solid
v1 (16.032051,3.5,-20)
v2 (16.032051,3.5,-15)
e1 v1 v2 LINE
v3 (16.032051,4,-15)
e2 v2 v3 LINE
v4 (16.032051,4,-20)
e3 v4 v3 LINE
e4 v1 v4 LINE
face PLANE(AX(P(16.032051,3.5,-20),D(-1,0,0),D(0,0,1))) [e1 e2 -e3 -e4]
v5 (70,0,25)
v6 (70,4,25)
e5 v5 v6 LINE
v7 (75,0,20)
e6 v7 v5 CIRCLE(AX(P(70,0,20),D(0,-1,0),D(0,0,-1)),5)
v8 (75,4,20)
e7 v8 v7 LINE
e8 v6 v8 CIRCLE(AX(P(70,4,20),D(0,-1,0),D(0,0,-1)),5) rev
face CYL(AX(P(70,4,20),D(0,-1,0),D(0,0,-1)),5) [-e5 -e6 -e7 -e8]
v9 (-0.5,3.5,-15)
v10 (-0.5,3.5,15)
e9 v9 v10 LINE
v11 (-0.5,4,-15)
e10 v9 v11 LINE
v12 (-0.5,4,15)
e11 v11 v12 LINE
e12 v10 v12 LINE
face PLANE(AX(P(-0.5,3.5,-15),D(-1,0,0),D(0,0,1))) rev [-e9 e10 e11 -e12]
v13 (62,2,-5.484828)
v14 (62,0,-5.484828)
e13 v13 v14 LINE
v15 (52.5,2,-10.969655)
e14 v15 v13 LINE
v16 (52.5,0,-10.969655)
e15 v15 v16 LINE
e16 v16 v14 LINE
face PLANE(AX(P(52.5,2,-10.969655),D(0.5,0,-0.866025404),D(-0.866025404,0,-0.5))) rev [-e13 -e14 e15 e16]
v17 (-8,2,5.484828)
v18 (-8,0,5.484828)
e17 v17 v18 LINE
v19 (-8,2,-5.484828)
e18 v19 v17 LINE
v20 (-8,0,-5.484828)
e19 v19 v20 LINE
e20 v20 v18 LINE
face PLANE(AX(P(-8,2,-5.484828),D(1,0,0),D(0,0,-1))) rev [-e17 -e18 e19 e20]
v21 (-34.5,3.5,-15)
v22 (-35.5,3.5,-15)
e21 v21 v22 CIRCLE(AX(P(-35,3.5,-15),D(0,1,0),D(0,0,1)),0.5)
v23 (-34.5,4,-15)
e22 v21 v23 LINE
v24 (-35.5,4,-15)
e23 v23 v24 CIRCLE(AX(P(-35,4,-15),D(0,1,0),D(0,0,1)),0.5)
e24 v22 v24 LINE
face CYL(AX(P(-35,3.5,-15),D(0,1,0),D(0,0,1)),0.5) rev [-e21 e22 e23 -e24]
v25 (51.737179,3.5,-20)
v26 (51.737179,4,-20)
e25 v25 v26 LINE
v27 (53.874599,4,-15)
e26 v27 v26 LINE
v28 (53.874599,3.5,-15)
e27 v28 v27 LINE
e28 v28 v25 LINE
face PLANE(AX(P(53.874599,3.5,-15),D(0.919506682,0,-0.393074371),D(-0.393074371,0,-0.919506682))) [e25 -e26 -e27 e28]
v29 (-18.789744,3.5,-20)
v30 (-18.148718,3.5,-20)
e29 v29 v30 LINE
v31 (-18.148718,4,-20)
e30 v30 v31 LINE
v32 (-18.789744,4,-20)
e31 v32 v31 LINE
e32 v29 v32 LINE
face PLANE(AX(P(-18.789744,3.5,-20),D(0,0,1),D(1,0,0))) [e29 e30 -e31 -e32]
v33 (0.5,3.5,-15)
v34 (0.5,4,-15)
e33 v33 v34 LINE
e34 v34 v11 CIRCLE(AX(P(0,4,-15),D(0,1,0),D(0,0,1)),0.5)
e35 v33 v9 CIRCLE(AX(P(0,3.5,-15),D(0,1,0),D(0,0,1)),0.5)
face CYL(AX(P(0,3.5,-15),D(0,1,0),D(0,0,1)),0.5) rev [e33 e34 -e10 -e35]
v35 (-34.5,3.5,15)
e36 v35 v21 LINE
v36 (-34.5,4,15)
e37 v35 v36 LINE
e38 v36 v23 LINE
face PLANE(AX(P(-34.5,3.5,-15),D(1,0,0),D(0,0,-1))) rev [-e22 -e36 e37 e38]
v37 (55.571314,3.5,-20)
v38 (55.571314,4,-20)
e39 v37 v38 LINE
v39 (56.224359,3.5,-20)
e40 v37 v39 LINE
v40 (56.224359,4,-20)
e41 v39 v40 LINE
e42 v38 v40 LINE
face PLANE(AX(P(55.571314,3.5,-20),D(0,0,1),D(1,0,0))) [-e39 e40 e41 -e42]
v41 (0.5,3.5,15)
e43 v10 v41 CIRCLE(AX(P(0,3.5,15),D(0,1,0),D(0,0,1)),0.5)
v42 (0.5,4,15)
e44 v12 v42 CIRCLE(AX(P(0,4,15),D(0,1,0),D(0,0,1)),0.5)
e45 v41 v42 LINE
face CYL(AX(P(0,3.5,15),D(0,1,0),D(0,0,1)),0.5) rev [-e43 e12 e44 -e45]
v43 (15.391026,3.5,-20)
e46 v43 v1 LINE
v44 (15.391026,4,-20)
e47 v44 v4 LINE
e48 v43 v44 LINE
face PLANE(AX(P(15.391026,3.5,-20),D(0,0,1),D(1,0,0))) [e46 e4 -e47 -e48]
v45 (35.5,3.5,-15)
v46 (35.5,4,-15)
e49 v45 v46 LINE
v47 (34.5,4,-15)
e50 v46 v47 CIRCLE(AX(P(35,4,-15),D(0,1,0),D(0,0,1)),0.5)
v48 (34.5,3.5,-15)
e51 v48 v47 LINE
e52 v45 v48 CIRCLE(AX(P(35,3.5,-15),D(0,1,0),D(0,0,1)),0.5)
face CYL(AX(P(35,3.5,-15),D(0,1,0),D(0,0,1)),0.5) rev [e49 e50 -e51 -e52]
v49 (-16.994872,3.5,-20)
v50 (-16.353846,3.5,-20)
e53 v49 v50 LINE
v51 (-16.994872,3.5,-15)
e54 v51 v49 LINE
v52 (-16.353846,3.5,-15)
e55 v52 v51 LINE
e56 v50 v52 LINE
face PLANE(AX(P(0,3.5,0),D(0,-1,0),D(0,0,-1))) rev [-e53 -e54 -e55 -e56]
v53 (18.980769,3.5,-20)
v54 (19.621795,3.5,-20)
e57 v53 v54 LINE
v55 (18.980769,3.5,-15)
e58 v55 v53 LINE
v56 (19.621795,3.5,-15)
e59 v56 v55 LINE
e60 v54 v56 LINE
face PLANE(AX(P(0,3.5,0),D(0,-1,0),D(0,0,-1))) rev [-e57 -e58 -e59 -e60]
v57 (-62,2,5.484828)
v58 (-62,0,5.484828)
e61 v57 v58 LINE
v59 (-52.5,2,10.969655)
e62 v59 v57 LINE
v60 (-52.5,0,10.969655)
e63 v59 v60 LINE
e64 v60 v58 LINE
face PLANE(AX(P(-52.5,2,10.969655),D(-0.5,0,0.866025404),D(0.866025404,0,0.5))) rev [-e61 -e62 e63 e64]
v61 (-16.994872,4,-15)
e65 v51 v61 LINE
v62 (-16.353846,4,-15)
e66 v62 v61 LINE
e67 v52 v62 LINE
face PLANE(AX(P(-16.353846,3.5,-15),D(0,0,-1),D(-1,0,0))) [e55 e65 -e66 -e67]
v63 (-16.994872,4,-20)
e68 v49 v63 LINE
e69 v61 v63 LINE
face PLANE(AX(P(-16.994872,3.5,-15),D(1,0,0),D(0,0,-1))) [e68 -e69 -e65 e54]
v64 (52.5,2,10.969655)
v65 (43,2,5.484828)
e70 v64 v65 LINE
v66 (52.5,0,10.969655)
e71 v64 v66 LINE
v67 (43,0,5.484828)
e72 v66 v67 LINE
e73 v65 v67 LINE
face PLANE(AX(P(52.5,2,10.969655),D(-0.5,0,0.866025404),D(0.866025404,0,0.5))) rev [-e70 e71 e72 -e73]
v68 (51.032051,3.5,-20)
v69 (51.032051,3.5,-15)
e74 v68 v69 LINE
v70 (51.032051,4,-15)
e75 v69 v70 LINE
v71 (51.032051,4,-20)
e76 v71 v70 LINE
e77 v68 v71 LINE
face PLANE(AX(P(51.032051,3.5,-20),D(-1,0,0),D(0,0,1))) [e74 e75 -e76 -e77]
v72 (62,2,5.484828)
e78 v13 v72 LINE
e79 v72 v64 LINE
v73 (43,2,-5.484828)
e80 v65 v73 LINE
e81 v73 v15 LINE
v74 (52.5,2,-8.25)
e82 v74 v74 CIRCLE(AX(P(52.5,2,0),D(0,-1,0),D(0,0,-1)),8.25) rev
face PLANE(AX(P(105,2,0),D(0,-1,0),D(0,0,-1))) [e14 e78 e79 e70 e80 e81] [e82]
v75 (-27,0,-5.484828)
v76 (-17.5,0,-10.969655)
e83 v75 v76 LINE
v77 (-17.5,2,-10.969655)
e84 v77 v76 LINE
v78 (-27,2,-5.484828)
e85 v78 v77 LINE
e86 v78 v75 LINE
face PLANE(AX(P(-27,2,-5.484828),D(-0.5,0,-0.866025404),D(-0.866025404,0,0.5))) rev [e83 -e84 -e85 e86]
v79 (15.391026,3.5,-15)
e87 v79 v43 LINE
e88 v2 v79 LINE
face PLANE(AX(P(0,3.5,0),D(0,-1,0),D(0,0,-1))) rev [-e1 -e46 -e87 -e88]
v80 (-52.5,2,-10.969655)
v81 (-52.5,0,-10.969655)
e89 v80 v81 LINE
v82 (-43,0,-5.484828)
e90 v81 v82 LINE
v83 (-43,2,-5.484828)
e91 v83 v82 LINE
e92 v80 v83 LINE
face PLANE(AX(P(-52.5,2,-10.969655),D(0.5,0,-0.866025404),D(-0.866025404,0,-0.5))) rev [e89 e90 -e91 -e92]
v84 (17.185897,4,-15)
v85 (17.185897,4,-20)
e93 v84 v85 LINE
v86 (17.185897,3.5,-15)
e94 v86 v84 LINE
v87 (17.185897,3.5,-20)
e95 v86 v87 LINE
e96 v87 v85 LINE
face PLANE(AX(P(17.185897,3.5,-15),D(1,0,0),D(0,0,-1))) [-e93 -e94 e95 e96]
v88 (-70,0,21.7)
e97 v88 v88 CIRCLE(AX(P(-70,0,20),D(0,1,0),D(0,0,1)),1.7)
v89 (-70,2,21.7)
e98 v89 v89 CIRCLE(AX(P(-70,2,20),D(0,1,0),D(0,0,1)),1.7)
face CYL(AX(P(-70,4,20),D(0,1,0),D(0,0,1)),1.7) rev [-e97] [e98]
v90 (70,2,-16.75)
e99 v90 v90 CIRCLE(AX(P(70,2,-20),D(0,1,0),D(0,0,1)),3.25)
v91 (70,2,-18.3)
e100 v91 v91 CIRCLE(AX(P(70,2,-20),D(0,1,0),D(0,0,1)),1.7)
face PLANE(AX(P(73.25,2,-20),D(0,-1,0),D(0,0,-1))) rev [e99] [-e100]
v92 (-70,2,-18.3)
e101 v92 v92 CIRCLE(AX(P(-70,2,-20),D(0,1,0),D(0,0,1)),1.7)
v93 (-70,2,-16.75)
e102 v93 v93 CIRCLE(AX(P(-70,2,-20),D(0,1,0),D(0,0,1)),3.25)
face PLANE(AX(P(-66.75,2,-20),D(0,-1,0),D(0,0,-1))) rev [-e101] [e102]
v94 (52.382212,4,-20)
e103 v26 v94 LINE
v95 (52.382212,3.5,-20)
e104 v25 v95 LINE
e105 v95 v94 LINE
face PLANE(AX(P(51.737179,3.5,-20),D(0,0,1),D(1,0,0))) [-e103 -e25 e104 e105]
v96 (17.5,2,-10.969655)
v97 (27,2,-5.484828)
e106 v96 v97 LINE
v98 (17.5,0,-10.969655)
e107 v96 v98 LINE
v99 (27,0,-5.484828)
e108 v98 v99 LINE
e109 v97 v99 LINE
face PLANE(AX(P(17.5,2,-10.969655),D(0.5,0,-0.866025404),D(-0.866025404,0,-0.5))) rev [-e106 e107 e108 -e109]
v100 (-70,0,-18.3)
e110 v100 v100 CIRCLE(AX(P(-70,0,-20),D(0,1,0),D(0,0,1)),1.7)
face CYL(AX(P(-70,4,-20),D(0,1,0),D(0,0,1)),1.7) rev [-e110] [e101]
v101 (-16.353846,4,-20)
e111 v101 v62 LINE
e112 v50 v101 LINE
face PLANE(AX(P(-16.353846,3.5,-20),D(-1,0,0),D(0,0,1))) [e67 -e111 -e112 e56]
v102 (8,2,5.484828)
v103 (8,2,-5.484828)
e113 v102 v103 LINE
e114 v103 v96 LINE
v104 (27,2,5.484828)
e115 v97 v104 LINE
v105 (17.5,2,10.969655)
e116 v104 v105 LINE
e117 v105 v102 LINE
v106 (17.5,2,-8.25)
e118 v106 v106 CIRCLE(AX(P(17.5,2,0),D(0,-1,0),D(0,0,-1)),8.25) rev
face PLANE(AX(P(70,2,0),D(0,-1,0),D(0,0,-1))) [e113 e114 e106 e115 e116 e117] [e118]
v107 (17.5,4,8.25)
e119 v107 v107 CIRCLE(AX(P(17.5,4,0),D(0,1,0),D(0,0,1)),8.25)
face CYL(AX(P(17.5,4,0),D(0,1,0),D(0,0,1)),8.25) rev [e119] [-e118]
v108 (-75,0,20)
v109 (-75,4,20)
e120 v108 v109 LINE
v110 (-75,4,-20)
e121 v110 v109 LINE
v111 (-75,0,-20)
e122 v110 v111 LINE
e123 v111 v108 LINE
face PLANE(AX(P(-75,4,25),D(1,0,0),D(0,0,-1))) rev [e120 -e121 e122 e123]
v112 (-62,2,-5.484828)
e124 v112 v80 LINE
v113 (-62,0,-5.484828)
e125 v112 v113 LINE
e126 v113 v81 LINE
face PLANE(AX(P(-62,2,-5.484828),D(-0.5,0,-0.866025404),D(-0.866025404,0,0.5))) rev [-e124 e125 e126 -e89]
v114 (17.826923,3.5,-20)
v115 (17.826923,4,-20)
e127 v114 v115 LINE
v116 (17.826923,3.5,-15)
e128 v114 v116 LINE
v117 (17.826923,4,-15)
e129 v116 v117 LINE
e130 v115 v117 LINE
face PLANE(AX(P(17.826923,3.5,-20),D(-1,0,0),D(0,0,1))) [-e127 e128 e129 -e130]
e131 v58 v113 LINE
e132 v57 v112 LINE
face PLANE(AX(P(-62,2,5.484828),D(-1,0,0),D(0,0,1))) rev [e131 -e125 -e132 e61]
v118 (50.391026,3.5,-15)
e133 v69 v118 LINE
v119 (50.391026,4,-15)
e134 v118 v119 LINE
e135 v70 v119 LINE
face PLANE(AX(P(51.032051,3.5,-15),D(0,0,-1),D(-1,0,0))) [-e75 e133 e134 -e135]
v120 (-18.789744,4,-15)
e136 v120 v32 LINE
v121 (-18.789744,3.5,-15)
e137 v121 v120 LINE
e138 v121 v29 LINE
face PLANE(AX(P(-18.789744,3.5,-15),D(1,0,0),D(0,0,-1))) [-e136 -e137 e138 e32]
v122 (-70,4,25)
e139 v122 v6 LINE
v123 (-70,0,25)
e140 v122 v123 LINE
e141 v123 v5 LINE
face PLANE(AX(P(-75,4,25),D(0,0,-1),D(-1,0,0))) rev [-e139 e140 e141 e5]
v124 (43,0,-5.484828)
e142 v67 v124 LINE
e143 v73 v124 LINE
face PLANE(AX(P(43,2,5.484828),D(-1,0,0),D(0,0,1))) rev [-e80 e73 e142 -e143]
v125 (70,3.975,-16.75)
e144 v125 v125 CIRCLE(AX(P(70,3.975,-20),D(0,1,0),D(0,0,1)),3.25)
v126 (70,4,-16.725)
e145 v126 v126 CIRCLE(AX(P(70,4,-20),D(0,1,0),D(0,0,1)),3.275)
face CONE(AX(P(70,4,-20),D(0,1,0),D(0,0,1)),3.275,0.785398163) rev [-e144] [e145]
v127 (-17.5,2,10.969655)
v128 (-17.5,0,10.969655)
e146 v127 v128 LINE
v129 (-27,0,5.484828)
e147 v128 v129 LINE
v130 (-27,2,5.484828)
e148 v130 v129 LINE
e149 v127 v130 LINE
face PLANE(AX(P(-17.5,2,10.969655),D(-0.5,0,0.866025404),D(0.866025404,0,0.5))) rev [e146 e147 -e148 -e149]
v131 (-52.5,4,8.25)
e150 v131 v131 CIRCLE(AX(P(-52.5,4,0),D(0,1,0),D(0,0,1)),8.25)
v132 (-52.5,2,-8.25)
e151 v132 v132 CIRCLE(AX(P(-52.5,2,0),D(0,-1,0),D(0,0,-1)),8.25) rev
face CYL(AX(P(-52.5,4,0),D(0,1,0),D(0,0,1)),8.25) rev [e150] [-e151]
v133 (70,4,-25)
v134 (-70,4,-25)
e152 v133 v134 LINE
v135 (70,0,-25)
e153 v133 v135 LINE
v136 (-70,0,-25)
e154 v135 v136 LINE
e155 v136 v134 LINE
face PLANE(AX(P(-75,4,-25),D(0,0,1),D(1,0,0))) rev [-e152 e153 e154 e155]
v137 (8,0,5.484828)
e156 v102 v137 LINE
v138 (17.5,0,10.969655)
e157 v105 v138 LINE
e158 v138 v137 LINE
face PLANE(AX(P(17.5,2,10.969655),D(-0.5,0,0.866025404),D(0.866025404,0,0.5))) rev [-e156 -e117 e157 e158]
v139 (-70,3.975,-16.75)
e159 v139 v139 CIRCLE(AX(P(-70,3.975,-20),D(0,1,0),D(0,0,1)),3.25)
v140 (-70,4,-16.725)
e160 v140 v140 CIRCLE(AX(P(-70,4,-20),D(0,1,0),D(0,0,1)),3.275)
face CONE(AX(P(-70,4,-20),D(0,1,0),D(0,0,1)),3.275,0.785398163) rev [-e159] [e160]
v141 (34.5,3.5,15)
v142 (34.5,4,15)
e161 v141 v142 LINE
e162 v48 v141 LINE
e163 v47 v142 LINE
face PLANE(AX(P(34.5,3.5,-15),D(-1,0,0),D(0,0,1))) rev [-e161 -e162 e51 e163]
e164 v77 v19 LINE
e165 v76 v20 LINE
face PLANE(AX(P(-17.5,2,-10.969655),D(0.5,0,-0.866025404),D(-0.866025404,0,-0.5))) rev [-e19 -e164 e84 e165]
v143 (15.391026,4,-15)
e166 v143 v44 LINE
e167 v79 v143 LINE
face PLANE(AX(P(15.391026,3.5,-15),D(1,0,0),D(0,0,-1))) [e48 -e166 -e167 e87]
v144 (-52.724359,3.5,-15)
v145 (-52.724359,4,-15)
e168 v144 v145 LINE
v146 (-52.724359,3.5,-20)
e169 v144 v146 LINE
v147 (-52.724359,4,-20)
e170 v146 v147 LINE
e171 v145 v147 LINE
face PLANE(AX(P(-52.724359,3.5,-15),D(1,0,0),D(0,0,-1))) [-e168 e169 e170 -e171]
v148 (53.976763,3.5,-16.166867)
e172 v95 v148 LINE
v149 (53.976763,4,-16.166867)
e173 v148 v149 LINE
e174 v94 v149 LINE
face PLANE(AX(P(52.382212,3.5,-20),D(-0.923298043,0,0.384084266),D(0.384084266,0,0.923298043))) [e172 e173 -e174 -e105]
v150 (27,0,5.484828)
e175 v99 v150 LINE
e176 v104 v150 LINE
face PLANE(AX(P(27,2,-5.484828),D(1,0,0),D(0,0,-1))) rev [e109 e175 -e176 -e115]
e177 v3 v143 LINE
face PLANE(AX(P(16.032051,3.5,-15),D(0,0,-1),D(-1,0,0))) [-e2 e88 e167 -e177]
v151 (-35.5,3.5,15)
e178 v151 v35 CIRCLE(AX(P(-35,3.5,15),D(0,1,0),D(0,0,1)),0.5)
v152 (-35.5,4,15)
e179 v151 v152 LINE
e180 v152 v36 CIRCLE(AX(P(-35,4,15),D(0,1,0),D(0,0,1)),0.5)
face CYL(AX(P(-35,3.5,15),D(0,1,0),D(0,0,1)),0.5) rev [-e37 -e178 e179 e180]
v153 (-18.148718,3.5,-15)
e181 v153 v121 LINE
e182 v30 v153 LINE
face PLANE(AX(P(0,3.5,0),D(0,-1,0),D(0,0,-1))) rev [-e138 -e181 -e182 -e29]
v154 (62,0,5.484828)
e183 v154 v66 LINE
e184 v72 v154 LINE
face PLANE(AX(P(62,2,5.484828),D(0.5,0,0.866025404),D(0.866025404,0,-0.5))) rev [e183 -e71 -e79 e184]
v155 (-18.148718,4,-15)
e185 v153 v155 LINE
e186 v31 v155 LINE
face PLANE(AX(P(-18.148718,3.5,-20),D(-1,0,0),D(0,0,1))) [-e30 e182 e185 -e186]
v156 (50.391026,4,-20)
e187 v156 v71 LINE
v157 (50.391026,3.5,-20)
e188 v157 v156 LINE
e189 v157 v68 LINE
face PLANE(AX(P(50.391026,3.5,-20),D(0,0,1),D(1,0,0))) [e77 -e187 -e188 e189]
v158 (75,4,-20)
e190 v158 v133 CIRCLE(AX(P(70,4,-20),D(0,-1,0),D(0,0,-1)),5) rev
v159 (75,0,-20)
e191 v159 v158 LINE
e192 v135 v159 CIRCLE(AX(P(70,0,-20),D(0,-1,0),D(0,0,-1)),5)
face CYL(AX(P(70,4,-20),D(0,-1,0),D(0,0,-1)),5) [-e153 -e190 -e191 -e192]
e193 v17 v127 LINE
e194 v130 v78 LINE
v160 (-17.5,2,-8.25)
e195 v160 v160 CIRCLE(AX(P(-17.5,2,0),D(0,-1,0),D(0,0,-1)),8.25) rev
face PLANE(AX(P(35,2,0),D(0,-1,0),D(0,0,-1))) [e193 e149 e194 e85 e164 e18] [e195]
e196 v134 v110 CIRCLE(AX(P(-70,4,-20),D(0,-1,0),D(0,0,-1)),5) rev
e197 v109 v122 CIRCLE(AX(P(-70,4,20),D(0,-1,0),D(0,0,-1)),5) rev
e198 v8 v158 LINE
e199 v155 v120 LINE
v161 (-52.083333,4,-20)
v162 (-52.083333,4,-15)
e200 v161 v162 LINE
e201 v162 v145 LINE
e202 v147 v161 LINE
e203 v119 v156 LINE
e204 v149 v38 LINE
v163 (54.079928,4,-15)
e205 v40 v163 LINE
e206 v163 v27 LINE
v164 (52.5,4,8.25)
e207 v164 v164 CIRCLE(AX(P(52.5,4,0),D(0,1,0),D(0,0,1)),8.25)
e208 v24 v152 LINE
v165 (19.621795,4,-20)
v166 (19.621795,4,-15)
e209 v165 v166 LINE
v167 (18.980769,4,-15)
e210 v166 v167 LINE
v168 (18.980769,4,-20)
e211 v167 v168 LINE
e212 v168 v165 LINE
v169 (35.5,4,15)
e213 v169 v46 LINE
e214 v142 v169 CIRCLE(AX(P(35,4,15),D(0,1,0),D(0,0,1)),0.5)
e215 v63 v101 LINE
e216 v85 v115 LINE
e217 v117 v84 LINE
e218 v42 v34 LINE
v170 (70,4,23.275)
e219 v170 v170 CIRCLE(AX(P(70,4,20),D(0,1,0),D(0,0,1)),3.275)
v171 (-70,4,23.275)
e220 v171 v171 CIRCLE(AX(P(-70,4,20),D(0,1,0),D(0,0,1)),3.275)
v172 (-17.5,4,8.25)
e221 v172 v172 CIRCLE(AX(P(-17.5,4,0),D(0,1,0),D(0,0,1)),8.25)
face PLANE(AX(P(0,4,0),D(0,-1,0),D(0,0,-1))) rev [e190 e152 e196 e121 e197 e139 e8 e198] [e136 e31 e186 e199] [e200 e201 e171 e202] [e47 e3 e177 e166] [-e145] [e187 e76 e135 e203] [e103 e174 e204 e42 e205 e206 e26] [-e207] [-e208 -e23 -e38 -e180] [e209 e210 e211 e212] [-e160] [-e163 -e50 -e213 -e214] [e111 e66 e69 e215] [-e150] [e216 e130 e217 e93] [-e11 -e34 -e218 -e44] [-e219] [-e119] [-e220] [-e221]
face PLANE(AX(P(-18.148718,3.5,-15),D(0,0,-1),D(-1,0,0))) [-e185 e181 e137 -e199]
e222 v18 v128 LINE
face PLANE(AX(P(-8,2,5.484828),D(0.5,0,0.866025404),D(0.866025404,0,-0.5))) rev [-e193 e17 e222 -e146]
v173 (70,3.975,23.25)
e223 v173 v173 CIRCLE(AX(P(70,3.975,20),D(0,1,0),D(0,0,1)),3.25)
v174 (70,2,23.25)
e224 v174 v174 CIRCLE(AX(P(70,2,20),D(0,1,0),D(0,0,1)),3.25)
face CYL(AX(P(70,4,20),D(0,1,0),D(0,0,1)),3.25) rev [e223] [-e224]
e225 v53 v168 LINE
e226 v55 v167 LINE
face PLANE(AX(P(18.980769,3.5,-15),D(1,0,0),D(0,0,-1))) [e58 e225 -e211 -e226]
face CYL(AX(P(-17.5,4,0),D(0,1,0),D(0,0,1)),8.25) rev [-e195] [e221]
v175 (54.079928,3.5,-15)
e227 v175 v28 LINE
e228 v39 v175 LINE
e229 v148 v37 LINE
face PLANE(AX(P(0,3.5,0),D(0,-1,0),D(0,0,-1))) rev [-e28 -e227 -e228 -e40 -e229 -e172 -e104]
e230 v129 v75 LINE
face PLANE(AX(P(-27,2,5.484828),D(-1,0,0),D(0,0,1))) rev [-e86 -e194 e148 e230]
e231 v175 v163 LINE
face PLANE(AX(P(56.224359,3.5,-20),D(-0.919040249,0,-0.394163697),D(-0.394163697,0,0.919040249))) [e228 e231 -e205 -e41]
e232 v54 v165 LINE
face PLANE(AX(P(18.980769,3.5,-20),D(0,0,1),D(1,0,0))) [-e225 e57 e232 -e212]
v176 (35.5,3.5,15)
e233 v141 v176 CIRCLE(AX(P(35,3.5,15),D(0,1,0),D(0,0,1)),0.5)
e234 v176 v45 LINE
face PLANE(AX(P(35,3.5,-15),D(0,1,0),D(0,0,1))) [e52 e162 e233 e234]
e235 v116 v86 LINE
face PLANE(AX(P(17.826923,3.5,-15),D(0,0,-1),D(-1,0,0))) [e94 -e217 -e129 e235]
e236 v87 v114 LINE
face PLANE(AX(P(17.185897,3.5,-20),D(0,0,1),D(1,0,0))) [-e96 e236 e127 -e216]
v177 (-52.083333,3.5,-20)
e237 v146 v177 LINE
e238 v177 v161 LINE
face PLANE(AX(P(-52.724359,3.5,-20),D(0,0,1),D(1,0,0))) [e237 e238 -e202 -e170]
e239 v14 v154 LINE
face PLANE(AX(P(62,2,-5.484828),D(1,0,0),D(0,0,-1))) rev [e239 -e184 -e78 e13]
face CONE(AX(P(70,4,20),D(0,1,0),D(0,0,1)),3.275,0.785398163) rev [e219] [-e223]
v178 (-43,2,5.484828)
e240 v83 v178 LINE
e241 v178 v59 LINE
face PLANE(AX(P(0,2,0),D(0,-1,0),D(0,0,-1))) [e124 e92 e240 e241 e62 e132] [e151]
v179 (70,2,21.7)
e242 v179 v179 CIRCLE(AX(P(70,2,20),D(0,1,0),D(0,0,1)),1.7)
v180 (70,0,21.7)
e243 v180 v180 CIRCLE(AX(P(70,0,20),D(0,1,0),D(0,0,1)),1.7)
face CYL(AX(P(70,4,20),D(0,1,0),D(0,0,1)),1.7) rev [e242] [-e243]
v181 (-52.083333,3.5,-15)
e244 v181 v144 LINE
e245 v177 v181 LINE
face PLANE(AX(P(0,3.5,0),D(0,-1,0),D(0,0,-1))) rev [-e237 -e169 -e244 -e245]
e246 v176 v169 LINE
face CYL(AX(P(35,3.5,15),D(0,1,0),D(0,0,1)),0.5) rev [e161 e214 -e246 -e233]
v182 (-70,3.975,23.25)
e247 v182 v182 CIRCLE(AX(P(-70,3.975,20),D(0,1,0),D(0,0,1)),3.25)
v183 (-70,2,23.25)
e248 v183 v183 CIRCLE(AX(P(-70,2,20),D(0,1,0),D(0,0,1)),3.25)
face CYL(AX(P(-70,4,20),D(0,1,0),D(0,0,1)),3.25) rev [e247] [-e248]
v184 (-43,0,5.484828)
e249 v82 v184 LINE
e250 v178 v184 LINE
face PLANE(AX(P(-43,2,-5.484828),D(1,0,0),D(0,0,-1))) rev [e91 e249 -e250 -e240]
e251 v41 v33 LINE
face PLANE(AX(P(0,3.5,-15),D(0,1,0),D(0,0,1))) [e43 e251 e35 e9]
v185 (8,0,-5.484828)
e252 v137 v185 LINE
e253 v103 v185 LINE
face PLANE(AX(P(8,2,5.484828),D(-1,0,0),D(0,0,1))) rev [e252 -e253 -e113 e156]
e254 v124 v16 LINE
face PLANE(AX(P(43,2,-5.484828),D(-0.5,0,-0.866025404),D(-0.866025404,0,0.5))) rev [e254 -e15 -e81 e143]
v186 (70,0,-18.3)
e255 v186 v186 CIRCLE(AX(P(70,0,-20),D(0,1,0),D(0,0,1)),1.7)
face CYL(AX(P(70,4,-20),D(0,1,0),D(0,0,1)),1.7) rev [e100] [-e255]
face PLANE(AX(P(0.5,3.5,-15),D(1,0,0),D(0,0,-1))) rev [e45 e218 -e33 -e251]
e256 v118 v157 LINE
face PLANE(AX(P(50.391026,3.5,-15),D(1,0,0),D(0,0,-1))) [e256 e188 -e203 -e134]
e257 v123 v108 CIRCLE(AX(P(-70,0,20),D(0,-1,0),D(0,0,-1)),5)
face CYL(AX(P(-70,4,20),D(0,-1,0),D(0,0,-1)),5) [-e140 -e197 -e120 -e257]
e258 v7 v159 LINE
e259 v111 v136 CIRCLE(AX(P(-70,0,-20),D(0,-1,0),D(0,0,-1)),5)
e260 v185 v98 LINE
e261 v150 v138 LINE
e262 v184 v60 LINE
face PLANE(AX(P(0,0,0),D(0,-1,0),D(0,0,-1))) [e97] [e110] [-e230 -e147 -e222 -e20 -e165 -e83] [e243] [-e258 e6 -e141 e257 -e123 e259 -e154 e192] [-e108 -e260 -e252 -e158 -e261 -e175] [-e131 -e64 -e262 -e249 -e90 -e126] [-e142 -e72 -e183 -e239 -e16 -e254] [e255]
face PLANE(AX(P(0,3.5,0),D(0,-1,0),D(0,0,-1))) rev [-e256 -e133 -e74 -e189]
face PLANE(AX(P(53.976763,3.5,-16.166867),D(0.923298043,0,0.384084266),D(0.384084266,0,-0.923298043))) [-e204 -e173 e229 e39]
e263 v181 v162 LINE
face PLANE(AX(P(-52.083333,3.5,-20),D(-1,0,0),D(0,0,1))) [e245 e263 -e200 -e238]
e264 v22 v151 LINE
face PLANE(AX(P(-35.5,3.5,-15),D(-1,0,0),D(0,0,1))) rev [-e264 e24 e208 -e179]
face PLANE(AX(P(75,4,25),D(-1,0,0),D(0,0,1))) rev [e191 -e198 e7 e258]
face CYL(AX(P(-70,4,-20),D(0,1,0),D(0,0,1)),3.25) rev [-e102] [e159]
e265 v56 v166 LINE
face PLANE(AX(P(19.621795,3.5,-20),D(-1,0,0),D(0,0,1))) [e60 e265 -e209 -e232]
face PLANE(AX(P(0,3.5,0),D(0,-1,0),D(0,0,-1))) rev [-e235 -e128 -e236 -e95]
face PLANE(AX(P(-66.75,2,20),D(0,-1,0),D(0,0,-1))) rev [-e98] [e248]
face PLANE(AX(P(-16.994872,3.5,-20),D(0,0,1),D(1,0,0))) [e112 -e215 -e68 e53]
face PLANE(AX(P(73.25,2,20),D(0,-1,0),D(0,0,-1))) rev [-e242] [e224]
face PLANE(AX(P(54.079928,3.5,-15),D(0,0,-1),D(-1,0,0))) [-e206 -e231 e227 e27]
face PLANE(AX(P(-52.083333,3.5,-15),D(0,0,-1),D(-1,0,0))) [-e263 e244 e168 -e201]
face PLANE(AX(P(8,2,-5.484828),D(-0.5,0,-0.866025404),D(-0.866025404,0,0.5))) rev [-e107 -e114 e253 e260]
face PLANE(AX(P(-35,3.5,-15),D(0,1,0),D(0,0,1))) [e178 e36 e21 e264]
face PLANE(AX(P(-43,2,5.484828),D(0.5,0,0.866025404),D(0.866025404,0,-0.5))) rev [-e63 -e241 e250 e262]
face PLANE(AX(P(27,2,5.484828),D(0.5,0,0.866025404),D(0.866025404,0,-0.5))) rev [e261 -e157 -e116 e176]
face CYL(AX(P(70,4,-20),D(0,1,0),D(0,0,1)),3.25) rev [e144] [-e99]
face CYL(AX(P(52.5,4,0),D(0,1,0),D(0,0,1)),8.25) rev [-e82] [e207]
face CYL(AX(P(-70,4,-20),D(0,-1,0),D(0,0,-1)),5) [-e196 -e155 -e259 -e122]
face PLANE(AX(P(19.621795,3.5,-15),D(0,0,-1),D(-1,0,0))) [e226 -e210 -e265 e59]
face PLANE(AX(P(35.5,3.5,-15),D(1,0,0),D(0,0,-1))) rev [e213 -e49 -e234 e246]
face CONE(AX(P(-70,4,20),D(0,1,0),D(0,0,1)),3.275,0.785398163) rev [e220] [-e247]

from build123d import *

# Parameters (mm, degrees)
SKETCH1_W              = 150
SKETCH1_H              = 50
BODY_DEPTH             = 4
EDGE_FILLETS_R         = 5
GX16_HOLE_D            = 16.5
GX16_NUT_CUTOUT_DEPTH  = 2
GX16_PATTERN_COUNT     = 4
GX16_PATTERN_PITCH     = 35
DESIGN_CUTOUT_SKETCH_W = 0.641025641
DESIGN_CUTOUT_SKETCH_H = 5
DESIGN_CUTOUT_DEPTH    = 0.5


# Read off the part's stored shape, not the designer's step: mounting_holes
with BuildPart() as part:
    # Sketch1 → body (new body)
    with BuildSketch(Plane(origin=(0, 0, 0), x_dir=(1, 0, 0), z_dir=(0, 1, 0))):
        Rectangle(SKETCH1_W, SKETCH1_H)
    extrude(amount=BODY_DEPTH)

    # mounting_holes outline → mounting_holes (revolve, cut)
    with BuildSketch(Plane(origin=(70, 0, 20), x_dir=(1, 0, 0), z_dir=(0, 0, 1))):
        Polygon((0, 0), (1.7, 0), (1.7, 2), (3.25, 2), (3.25, 3.975), (3.275, 4), (0, 4), align=None)
    revolve(axis=Axis((70, 0, 20), (0, 1, 0)), mode=Mode.SUBTRACT)

    # mounting_holes 2 outline → mounting_holes 2 (revolve, cut)
    with BuildSketch(Plane(origin=(-70, 0, -20), x_dir=(1, 0, 0), z_dir=(0, 0, 1))):
        Polygon((0, 4), (0, 0), (1.7, 0), (1.7, 2), (3.25, 2), (3.25, 3.975), (3.275, 4), align=None)
    revolve(axis=Axis((-70, 0, -20), (0, 1, 0)), mode=Mode.SUBTRACT)

    # mounting_holes 3 outline → mounting_holes 3 (revolve, cut)
    with BuildSketch(Plane(origin=(70, 0, -20), x_dir=(1, 0, 0), z_dir=(0, 0, 1))):
        Polygon((0, 4), (0, 0), (1.7, 0), (1.7, 2), (3.25, 2), (3.25, 3.975), (3.275, 4), align=None)
    revolve(axis=Axis((70, 0, -20), (0, 1, 0)), mode=Mode.SUBTRACT)

    # mounting_holes 4 outline → mounting_holes 4 (revolve, cut)
    with BuildSketch(Plane(origin=(-70, 0, 20), x_dir=(1, 0, 0), z_dir=(0, 0, 1))):
        Polygon((0, 4), (0, 0), (1.7, 0), (1.7, 2), (3.25, 2), (3.25, 3.975), (3.275, 4), align=None)
    revolve(axis=Axis((-70, 0, 20), (0, 1, 0)), mode=Mode.SUBTRACT)

    # edge_fillets
    edge_fillets_edges = [part.edges().sort_by_distance(p)[0] for p in [
        (75, 2, 25),
        (-75, 2, 25),
        (-75, 2, -25),
        (75, 2, -25),
    ]]
    fillet(edge_fillets_edges, radius=EDGE_FILLETS_R)

    # gx16_hole (through all)
    with Locations(Plane(origin=(0, 4, 0), x_dir=(1, 0, 0), z_dir=(0, 1, 0))):
        with Locations((-52.5, 0)):
            gx16_hole = Hole(GX16_HOLE_D / 2)

    # Sketch6 → gx16_nut-cutout (cut)
    with BuildSketch(Plane.XZ):
        Polygon((-52.5, 10.969655115), (-62, 5.484827557), (-62, -5.484827557), (-52.5, -10.969655115), (-43, -5.484827557), (-43, 5.484827557), align=None)
    gx16_nut_cutout = extrude(amount=-GX16_NUT_CUTOUT_DEPTH, mode=Mode.SUBTRACT)

    # gx16_pattern: gx16_hole, gx16_nut-cutout ×4
    with Locations(*[(i * GX16_PATTERN_PITCH, 0, 0) for i in range(1, GX16_PATTERN_COUNT)]):
        add(gx16_hole, mode=Mode.SUBTRACT)
        add(gx16_nut_cutout, mode=Mode.SUBTRACT)

    # design_cutout_sketch → design_cutout (cut)
    with BuildSketch(Plane(origin=(0, 4, 0), x_dir=(1, 0, 0), z_dir=(0, 1, 0))):
        with BuildLine():
            Line((-34.5, 15), (-34.5, -15))
            ThreePointArc((-34.5, -15), (-35, -15.5), (-35.5, -15))
            Line((-35.5, -15), (-35.5, 15))
            ThreePointArc((-35.5, 15), (-35, 15.5), (-34.5, 15))
        make_face()
        with BuildLine():
            Line((0.5, 15), (0.5, -15))
            ThreePointArc((0.5, -15), (0, -15.5), (-0.5, -15))
            Line((-0.5, -15), (-0.5, 15))
            ThreePointArc((-0.5, 15), (0, 15.5), (0.5, 15))
        make_face()
        with BuildLine():
            Line((35.5, 15), (35.5, -15))
            ThreePointArc((35.5, -15), (35, -15.5), (34.5, -15))
            Line((34.5, -15), (34.5, 15))
            ThreePointArc((34.5, 15), (35, 15.5), (35.5, 15))
        make_face()
        with Locations((-52.403846154, 17.5)):
            Rectangle(DESIGN_CUTOUT_SKETCH_W, DESIGN_CUTOUT_SKETCH_H)
        with Locations((-18.46923077, 17.5)):
            Rectangle(DESIGN_CUTOUT_SKETCH_W, DESIGN_CUTOUT_SKETCH_H)
        with Locations((-16.674358975, 17.5)):
            Rectangle(DESIGN_CUTOUT_SKETCH_W, DESIGN_CUTOUT_SKETCH_H)
        with Locations((15.711538462, 17.5)):
            Rectangle(DESIGN_CUTOUT_SKETCH_W, DESIGN_CUTOUT_SKETCH_H)
        with Locations((17.506410257, 17.5)):
            Rectangle(DESIGN_CUTOUT_SKETCH_W, DESIGN_CUTOUT_SKETCH_H)
        with Locations((19.301282052, 17.5)):
            Rectangle(DESIGN_CUTOUT_SKETCH_W, DESIGN_CUTOUT_SKETCH_H)
        with Locations((50.711538462, 17.5)):
            Rectangle(DESIGN_CUTOUT_SKETCH_W, DESIGN_CUTOUT_SKETCH_H)
        Polygon((51.737179487, 20), (52.382211538, 20), (53.976762821, 16.166866987), (55.571314103, 20), (56.224358974, 20), (54.079927885, 15), (53.874599359, 15), align=None)
    extrude(amount=-DESIGN_CUTOUT_DEPTH, mode=Mode.SUBTRACT)


solid = part.part
